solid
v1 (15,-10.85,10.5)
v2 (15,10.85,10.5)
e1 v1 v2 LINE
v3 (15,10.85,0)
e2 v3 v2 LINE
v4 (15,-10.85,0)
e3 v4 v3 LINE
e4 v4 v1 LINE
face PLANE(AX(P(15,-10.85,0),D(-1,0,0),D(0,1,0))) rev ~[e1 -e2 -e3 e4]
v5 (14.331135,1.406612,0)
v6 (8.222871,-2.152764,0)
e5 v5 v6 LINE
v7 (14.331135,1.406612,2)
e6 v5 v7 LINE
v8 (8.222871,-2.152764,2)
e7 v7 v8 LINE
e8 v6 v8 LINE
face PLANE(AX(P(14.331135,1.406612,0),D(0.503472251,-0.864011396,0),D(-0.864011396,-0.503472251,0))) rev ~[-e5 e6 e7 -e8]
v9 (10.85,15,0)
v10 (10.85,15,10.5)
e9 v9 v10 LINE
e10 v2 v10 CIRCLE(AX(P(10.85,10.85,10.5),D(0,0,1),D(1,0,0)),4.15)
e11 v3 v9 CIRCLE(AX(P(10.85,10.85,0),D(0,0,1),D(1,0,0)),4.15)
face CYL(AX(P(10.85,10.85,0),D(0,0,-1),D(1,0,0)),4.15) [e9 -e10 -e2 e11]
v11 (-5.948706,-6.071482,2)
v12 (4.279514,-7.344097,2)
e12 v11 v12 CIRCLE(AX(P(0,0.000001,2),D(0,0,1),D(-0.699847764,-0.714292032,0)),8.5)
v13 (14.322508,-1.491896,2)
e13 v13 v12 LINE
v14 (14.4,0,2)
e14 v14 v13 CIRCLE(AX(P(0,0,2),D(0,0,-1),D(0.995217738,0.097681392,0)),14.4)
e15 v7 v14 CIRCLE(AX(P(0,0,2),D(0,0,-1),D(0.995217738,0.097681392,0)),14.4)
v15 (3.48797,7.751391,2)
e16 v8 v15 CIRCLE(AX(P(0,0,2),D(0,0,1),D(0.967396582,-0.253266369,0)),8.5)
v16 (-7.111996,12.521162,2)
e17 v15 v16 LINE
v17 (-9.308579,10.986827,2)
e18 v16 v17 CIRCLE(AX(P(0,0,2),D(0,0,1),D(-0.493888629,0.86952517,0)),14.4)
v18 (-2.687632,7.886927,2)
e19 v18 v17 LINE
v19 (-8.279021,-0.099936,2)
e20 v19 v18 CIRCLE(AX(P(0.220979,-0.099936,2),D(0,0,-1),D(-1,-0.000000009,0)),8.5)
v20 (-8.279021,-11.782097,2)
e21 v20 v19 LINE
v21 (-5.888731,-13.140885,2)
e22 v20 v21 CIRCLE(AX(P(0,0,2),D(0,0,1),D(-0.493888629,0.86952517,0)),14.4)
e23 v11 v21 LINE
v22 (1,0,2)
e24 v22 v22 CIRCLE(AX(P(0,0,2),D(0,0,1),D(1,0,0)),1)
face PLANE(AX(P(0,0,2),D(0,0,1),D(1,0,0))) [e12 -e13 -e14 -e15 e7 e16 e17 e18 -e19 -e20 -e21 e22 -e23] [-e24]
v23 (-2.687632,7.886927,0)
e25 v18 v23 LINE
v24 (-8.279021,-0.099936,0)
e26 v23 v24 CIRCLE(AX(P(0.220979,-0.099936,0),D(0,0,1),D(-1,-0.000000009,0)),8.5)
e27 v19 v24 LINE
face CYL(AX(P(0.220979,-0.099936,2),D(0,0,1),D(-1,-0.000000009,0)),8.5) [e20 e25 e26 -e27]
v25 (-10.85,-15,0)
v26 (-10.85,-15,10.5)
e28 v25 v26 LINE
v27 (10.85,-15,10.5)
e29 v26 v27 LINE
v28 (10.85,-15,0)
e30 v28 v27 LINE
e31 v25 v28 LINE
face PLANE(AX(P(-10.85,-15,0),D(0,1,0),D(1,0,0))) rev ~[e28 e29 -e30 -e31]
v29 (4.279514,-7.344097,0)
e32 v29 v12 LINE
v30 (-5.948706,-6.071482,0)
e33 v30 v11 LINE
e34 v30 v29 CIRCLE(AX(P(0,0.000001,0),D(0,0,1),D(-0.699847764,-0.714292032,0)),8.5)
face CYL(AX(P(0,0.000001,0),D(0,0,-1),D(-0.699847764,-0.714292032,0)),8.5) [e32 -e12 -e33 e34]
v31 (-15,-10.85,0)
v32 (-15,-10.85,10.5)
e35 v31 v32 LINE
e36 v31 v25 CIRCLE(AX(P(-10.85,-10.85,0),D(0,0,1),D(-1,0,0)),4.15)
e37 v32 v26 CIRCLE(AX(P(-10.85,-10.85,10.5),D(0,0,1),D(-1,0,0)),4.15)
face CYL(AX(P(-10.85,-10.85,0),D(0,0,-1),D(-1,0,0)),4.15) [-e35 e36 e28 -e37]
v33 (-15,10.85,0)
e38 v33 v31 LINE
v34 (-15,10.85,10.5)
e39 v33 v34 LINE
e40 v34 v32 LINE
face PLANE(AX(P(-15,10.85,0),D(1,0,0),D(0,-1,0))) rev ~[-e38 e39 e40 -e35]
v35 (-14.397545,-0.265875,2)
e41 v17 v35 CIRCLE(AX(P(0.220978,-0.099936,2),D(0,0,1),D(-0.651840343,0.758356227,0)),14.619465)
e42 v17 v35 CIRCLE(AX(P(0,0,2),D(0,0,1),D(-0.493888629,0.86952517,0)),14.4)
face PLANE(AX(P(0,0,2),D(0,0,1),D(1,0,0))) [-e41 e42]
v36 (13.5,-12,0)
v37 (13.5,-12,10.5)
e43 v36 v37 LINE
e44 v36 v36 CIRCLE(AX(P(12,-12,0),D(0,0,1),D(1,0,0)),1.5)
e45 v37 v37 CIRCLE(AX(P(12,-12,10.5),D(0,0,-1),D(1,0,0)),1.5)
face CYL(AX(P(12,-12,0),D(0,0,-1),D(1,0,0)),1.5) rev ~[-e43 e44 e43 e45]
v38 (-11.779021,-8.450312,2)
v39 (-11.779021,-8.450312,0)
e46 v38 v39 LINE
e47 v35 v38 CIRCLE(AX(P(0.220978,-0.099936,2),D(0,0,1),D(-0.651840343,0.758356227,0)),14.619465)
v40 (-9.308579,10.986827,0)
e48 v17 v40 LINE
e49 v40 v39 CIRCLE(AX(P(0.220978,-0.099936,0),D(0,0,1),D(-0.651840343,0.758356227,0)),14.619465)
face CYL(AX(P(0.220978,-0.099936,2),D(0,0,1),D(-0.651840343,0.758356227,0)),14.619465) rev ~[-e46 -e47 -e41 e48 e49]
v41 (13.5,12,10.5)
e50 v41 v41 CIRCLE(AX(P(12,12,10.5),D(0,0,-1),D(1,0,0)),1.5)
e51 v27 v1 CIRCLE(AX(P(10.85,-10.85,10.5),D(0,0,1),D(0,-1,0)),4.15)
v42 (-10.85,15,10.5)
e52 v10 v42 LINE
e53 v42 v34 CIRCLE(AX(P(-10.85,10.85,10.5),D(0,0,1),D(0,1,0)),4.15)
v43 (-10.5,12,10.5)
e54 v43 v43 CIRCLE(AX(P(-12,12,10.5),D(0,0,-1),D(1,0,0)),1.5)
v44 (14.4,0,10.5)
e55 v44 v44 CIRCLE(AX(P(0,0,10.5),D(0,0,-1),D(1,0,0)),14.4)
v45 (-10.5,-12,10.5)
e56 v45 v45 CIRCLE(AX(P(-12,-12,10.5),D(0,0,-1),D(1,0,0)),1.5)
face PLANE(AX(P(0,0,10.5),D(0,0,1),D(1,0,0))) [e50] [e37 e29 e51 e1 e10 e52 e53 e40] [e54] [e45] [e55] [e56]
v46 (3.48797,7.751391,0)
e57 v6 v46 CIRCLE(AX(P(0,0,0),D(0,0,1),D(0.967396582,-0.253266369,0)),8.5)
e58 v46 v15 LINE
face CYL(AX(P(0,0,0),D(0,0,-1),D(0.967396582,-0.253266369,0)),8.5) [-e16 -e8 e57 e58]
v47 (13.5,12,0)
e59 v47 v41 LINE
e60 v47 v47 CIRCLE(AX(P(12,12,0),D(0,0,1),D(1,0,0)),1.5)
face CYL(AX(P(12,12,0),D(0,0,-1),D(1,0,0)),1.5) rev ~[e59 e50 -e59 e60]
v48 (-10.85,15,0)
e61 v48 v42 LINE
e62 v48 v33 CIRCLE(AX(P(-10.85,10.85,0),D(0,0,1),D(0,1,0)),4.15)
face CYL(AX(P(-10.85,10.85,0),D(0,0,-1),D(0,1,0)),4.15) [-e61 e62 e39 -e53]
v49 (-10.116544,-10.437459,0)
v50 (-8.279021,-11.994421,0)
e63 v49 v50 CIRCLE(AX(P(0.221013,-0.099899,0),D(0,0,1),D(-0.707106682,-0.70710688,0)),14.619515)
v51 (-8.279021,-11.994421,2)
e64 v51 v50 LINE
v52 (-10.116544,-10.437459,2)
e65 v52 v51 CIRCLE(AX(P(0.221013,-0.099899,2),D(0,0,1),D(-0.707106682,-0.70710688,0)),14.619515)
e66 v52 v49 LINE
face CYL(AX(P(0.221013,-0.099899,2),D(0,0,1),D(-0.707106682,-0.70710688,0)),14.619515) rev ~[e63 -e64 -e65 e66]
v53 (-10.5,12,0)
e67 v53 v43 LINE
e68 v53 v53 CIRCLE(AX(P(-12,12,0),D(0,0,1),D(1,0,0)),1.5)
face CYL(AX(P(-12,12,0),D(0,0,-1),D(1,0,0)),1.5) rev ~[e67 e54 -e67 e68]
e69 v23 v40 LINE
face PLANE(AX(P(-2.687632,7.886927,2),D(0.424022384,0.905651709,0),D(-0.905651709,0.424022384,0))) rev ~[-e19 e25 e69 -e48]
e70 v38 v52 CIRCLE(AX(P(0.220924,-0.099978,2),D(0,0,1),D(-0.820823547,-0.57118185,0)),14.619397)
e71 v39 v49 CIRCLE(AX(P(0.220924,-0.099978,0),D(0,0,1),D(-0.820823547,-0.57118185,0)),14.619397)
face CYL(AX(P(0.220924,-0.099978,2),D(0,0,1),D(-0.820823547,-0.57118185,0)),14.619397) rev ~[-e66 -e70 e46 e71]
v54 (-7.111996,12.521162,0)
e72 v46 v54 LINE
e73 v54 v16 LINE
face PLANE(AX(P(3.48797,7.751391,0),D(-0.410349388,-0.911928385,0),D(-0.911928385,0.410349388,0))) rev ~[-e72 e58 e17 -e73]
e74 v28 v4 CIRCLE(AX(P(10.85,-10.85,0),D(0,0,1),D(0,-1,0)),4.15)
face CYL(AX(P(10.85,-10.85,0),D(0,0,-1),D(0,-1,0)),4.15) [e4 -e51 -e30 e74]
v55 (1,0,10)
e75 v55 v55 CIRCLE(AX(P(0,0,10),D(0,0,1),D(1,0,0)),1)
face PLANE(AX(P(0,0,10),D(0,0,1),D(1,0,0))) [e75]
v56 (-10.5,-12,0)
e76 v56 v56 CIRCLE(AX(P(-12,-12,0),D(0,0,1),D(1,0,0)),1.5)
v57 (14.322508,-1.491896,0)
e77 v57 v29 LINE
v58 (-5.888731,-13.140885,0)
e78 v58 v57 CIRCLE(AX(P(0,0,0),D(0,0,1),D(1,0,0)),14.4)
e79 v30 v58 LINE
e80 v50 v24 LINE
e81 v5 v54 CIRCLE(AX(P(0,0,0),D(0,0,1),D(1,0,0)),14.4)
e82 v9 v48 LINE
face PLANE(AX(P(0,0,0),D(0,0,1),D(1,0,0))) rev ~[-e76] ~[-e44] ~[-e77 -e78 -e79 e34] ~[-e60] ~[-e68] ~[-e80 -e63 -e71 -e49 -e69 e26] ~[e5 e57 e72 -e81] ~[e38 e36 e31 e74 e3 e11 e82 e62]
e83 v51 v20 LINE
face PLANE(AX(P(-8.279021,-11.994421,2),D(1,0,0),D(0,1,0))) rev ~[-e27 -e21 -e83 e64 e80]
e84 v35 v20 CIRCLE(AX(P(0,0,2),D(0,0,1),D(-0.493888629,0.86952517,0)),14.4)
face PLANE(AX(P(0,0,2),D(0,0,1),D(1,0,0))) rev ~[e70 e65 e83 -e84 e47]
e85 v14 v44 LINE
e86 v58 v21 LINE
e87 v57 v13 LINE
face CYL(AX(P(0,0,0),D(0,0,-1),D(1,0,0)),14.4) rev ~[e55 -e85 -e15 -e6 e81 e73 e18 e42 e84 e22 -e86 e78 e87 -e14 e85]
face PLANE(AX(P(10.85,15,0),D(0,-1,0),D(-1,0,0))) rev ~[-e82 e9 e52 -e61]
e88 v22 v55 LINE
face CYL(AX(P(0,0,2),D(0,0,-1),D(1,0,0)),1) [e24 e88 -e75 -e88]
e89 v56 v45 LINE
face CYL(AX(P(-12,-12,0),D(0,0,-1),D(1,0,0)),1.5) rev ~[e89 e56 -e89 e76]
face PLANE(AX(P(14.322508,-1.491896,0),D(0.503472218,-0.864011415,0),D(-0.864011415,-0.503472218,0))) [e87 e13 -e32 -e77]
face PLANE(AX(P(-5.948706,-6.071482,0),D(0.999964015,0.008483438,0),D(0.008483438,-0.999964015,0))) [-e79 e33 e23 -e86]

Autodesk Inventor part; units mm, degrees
ref_plane "YZ Plane" through (0, 0, 0) normal (1, 0, 0) x (0, 1, 0)
ref_plane "XZ Plane" through (0, 0, 0) normal (0, 1, 0) x (-1, 0, 0)
ref_plane "XY Plane" through (0, 0, 0) normal (0, 0, 1) x (1, 0, 0)
sketch "Эскиз1" plane through (0, 0, 0) normal (0, 0, 1) x (1, 0, 0)
  line L0 (0, 0) -> (0, 15) construction
  line L1 (0, 0) -> (-22.981013, 0) construction
  line L2 (10.85, 15) -> (-10.85, 15)
  line L3 (-15, 10.85) -> (-15, -10.85)
  line L4 (-10.85, -15) -> (10.85, -15)
  line L5 (15, -10.85) -> (15, 10.85)
  line L6 (15, 15) -> (-15, -15) construction
  line L7 (-15, 15) -> (15, -15) construction
  circle A0 centre (0, 0) radius 14.4
  line L8 (-12, -12) -> (12, -12) construction
  line L9 (12, -12) -> (12, 12) construction
  line L10 (12, 12) -> (-12, 12) construction
  line L11 (-12, 12) -> (-12, -12) construction
  line L12 (-12, -12) -> (12, 12) construction
  line L13 (12, -12) -> (-12, 12) construction
  circle A1 centre (12, 12) radius 1.5
  circle A2 centre (-12, 12) radius 1.5
  circle A3 centre (-12, -12) radius 1.5
  circle A4 centre (12, -12) radius 1.5
  arc A5 (15, 10.85) -> (10.85, 15) centre (10.85, 10.85) ccw
  arc A6 (-10.85, 15) -> (-15, 10.85) centre (-10.85, 10.85) ccw
  arc A7 (-15, -10.85) -> (-10.85, -15) centre (-10.85, -10.85) ccw
  arc A8 (10.85, -15) -> (15, -10.85) centre (10.85, -10.85) ccw
  line L14 (0, 0) -> (26.197647, 0) construction
  line L15 (14.322508, -1.491896) -> (4.279514, -7.344097)
  line L16 (14.331135, 1.406612) -> (8.222871, -2.152764)
  line L17 (14.4, 0) -> (7.870044, -3.805102) construction
  line L18 (-7.13266, -13.861758) -> (-7.204633, -5.378159) construction
  line L19 (-8.370965, 11.716951) -> (-0.710884, 8.270069) construction
  line L20 (-8.401084, -11.695375) -> (-8.500306, 0)
  line L21 (-5.948706, -6.071482) -> (-5.888731, -13.140885)
  line L22 (3.48797, 7.751391) -> (-7.111996, 12.521162)
  line L23 (-3.02844, 7.942201) -> (-9.475461, 10.84323)
  arc A9 (8.222871, -2.152764) -> (3.48797, 7.751391) centre (0, 0) ccw
  arc A10 (-3.02844, 7.942201) -> (-8.5, 0) centre (0, 0) ccw
  arc A11 (-5.948706, -6.071482) -> (4.279514, -7.344097) centre (0, 0) ccw
  arc A12 (14.322508, -1.491896) -> (14.331135, 1.406612) centre (0, 0) ccw
  arc A13 (-8.401084, -11.695375) -> (-5.888731, -13.140885) centre (0, 0) ccw
  arc A14 (-7.111996, 12.521162) -> (-9.475461, 10.84323) centre (0, 0) ccw
  arc A15 (14.322508, -1.491896) -> (14.331135, 1.406612) centre (0, 0) ccw
  arc A16 (-9.475461, 10.84323) -> (-8.401084, -11.695375) centre (0, 0) ccw
  line L24 (-9.475461, 10.84323) -> (-3.02844, 7.942201)
  line L25 (-8.500306, 0) -> (-8.401084, -11.695375)
  line L26 (-5.948706, -6.071482) -> (-5.888731, -13.140885)
  arc A17 (-8.401084, -11.695375) -> (-5.888731, -13.140885) centre (0, 0) ccw
  arc A18 (-9.475461, 10.84323) -> (-5.888731, -13.140885) centre (0, 0) ccw
  arc A19 (-7.111996, 12.521162) -> (-8.401084, -11.695375) centre (0, 0) ccw
  point P0 (-0.367875, -0.714936)
  dimension "d24" = 360
  dimension "d52" = 28.8
  dimension "d0" = 30
  dimension "d1" = 30
  dimension "d8" = 3
  dimension "d9" = 3
  dimension "d10" = 3
  dimension "d11" = 3
  dimension "d19" = 2.5
  dimension "d26" = 1.25
  dimension "d27" = 2.5
  dimension "d28" = 1.25
  dimension "d32" = 2.5
  dimension "d33" = 1.25
  dimension "d49" = 8.5
  dimension "d50" = 8.5
  dimension "d51" = 8.5
  dimension "d53" = 24
extrude "Выдавливание2" add sketch "Эскиз1" along normal blind 10.5 contours A5 L5 A8 L4 A7 L3 A6 L2 | A1 | A2 | A3 | A4
extrude "Выдавливание3" add sketch "Эскиз1" along normal blind 2 contours A0 L15 A11 L21 L20 A10 L23 L22 A9 L16 | L23 A10 L20 A0
sketch "Эскиз2" plane through (0, 0, 2) normal (0, 0, 1) x (1, 0, 0)
  circle A0 centre (0, 0) radius 1
  dimension "d45" = 2
extrude "Выдавливание6" add sketch "Эскиз2" along normal blind 8
sketch "Эскиз3" plane through (0, 0, 2) normal (0, 0, 1) x (1, 0, 0)
  line L0 (0.220979, -0.099936) -> (0.220979, 15) construction
  line L1 (0.220979, -0.099936) -> (-22.981013, -0.099936) construction
  line L2 (10.85, 14.900064) -> (-10.408041, 14.900064)
  line L3 (-14.779021, 10.529085) -> (-14.779021, -10.728956)
  line L4 (-10.408041, -15.099936) -> (10.85, -15.099936)
  line L5 (15.220979, -10.728956) -> (15.220979, 10.529085)
  line L6 (15.220979, 14.900064) -> (-14.779021, -15.099936) construction
  line L7 (-14.779021, 14.900064) -> (15.220979, -15.099936) construction
  line L8 (-11.779021, -12.099936) -> (12.220979, -12.099936) construction
  line L9 (12.220979, -12.099936) -> (12.220979, 11.900064) construction
  line L10 (12.220979, 11.900064) -> (-11.779021, 11.900064) construction
  line L11 (-11.779021, 11.900064) -> (-11.779021, -12.099936) construction
  line L12 (-11.779021, -12.099936) -> (12.220979, 11.900064) construction
  line L13 (12.220979, -12.099936) -> (-11.779021, 11.900064) construction
  circle A0 centre (12.220979, 11.900064) radius 1.75
  circle A1 centre (-11.779021, 11.900064) radius 1.75
  circle A2 centre (-11.779021, -12.099936) radius 1.75
  circle A3 centre (12.220979, -12.099936) radius 1.75
  arc A4 (15.220979, 10.529085) -> (10.85, 14.900064) centre (10.85, 10.529085) ccw
  arc A5 (-10.408041, 14.900064) -> (-14.779021, 10.529085) centre (-10.408041, 10.529085) ccw
  arc A6 (-14.779021, -10.728956) -> (-10.408041, -15.099936) centre (-10.408041, -10.728956) ccw
  arc A7 (10.85, -15.099936) -> (15.220979, -10.728956) centre (10.85, -10.728956) ccw
  line L14 (0.220979, -0.099936) -> (26.197647, -0.099936) construction
  line L15 (14.765082, -1.58245) -> (4.43625, -7.481094)
  line L16 (14.773156, 1.301112) -> (8.424753, -2.324366)
  line L17 (14.840445, -0.099936) -> (7.933925, -4.044147) construction
  line L18 (-7.029021, -14.080975) -> (-7.029021, -5.340351) construction
  line L19 (-8.202223, 11.849057) -> (-0.585826, 8.283092) construction
  line L20 (-8.279021, -11.994421) -> (-8.279021, -0.099936)
  line L21 (-5.779021, -6.120733) -> (-5.779021, -13.431431)
  line L22 (3.825169, 7.598104) -> (-6.947092, 12.641631)
  line L23 (-2.687632, 7.886927) -> (-9.308579, 10.986827)
  arc A8 (8.424753, -2.324366) -> (3.825169, 7.598104) centre (0.220979, -0.099936) ccw
  arc A9 (-2.687632, 7.886927) -> (-8.279021, -0.099936) centre (0.220979, -0.099936) ccw
  arc A10 (-5.779021, -6.120733) -> (4.43625, -7.481094) centre (0.220979, -0.099936) ccw
  arc A11 (14.765082, -1.58245) -> (14.773156, 1.301112) centre (0.441536, -0.100553) ccw
  arc A12 (-6.947092, 12.641631) -> (-8.202223, 11.849057) centre (0.103647, 0.085873) ccw
  arc A13 (14.765082, -1.58245) -> (14.773156, 1.301112) centre (0.441536, -0.100553) ccw
  line L24 (-9.308579, 10.986827) -> (-2.687632, 7.886927)
  line L25 (-8.279021, -0.099936) -> (-8.279021, -11.994421)
  line L26 (-5.779021, -6.120733) -> (-5.779021, -13.431431)
  arc A14 (-6.947092, 12.641631) -> (-8.202223, 11.849057) centre (0.220979, -0.099936) ccw
  arc A15 (-9.308579, 10.986827) -> (-8.279021, -11.994421) centre (0.220979, -0.099936) ccw
  arc A16 (-10.116544, -10.437459) -> (-7.029021, -12.795064) centre (0.220979, -0.099936) ccw
  arc A17 (-7.029021, -12.795064) -> (-5.779021, -13.431431) centre (0.220979, -0.099936) ccw
  arc A18 (-7.029021, -12.795064) -> (-8.202223, 11.849057) centre (0.220979, -0.099936) ccw
  arc A19 (-7.029021, -12.795064) -> (-5.779021, -13.431431) centre (0.121294, -0.295744) ccw
  arc A20 (-11.779021, -8.450312) -> (-5.779021, -13.431431) centre (0.220979, -0.099936) ccw
  arc A21 (-7.029021, -12.795064) -> (-5.779021, -13.431431) centre (0.220979, -0.099936) ccw
  circle A22 centre (0, 0) radius 14.4
  point P0 (-0.130266, -0.777285)
  dimension "d73" = 360
  dimension "d56" = 30
  dimension "d57" = 30
  dimension "d58" = 3.5
  dimension "d59" = 3.5
  dimension "d60" = 3.5
  dimension "d61" = 3.5
  dimension "d62" = 2.5
  dimension "d63" = 1.25
  dimension "d64" = 2.5
  dimension "d65" = 1.25
  dimension "d66" = 2.5
  dimension "d67" = 1.25
  dimension "d68" = 8.5
  dimension "d69" = 8.5
  dimension "d70" = 8.5
  dimension "d72" = 24
  dimension "d78" = 14.61947
sketch "Эскиз3 outline for Выдавливание7" plane through (0, 0, 2) normal (0, 0, 1) x (1, 0, 0)
  line L0 (-8.279021, -11.994421) -> (-8.279021, -0.099936)
  arc A0 (-10.116544, -10.437459) -> (-8.279021, -11.994421) centre (0.220979, -0.099936) ccw
  arc A1 (-11.779021, -8.450312) -> (-10.116544, -10.437459) centre (0.220979, -0.099936) ccw
  arc A2 (-9.308579, 10.986827) -> (-11.779021, -8.450312) centre (0.220979, -0.099936) ccw
  line L1 (-2.687632, 7.886927) -> (-9.308579, 10.986827)
  arc A3 (-8.279021, -0.099936) -> (-2.687632, 7.886927) centre (0.220979, -0.099936) cw
extrude "Выдавливание7" cut sketch "Эскиз3 outline for Выдавливание7" against normal blind 10
extrude "Выдавливание8" cut sketch "Эскиз1" along normal blind 20 contours A1 | A2 | A3 | A4
properties part number "кулер корпус"
